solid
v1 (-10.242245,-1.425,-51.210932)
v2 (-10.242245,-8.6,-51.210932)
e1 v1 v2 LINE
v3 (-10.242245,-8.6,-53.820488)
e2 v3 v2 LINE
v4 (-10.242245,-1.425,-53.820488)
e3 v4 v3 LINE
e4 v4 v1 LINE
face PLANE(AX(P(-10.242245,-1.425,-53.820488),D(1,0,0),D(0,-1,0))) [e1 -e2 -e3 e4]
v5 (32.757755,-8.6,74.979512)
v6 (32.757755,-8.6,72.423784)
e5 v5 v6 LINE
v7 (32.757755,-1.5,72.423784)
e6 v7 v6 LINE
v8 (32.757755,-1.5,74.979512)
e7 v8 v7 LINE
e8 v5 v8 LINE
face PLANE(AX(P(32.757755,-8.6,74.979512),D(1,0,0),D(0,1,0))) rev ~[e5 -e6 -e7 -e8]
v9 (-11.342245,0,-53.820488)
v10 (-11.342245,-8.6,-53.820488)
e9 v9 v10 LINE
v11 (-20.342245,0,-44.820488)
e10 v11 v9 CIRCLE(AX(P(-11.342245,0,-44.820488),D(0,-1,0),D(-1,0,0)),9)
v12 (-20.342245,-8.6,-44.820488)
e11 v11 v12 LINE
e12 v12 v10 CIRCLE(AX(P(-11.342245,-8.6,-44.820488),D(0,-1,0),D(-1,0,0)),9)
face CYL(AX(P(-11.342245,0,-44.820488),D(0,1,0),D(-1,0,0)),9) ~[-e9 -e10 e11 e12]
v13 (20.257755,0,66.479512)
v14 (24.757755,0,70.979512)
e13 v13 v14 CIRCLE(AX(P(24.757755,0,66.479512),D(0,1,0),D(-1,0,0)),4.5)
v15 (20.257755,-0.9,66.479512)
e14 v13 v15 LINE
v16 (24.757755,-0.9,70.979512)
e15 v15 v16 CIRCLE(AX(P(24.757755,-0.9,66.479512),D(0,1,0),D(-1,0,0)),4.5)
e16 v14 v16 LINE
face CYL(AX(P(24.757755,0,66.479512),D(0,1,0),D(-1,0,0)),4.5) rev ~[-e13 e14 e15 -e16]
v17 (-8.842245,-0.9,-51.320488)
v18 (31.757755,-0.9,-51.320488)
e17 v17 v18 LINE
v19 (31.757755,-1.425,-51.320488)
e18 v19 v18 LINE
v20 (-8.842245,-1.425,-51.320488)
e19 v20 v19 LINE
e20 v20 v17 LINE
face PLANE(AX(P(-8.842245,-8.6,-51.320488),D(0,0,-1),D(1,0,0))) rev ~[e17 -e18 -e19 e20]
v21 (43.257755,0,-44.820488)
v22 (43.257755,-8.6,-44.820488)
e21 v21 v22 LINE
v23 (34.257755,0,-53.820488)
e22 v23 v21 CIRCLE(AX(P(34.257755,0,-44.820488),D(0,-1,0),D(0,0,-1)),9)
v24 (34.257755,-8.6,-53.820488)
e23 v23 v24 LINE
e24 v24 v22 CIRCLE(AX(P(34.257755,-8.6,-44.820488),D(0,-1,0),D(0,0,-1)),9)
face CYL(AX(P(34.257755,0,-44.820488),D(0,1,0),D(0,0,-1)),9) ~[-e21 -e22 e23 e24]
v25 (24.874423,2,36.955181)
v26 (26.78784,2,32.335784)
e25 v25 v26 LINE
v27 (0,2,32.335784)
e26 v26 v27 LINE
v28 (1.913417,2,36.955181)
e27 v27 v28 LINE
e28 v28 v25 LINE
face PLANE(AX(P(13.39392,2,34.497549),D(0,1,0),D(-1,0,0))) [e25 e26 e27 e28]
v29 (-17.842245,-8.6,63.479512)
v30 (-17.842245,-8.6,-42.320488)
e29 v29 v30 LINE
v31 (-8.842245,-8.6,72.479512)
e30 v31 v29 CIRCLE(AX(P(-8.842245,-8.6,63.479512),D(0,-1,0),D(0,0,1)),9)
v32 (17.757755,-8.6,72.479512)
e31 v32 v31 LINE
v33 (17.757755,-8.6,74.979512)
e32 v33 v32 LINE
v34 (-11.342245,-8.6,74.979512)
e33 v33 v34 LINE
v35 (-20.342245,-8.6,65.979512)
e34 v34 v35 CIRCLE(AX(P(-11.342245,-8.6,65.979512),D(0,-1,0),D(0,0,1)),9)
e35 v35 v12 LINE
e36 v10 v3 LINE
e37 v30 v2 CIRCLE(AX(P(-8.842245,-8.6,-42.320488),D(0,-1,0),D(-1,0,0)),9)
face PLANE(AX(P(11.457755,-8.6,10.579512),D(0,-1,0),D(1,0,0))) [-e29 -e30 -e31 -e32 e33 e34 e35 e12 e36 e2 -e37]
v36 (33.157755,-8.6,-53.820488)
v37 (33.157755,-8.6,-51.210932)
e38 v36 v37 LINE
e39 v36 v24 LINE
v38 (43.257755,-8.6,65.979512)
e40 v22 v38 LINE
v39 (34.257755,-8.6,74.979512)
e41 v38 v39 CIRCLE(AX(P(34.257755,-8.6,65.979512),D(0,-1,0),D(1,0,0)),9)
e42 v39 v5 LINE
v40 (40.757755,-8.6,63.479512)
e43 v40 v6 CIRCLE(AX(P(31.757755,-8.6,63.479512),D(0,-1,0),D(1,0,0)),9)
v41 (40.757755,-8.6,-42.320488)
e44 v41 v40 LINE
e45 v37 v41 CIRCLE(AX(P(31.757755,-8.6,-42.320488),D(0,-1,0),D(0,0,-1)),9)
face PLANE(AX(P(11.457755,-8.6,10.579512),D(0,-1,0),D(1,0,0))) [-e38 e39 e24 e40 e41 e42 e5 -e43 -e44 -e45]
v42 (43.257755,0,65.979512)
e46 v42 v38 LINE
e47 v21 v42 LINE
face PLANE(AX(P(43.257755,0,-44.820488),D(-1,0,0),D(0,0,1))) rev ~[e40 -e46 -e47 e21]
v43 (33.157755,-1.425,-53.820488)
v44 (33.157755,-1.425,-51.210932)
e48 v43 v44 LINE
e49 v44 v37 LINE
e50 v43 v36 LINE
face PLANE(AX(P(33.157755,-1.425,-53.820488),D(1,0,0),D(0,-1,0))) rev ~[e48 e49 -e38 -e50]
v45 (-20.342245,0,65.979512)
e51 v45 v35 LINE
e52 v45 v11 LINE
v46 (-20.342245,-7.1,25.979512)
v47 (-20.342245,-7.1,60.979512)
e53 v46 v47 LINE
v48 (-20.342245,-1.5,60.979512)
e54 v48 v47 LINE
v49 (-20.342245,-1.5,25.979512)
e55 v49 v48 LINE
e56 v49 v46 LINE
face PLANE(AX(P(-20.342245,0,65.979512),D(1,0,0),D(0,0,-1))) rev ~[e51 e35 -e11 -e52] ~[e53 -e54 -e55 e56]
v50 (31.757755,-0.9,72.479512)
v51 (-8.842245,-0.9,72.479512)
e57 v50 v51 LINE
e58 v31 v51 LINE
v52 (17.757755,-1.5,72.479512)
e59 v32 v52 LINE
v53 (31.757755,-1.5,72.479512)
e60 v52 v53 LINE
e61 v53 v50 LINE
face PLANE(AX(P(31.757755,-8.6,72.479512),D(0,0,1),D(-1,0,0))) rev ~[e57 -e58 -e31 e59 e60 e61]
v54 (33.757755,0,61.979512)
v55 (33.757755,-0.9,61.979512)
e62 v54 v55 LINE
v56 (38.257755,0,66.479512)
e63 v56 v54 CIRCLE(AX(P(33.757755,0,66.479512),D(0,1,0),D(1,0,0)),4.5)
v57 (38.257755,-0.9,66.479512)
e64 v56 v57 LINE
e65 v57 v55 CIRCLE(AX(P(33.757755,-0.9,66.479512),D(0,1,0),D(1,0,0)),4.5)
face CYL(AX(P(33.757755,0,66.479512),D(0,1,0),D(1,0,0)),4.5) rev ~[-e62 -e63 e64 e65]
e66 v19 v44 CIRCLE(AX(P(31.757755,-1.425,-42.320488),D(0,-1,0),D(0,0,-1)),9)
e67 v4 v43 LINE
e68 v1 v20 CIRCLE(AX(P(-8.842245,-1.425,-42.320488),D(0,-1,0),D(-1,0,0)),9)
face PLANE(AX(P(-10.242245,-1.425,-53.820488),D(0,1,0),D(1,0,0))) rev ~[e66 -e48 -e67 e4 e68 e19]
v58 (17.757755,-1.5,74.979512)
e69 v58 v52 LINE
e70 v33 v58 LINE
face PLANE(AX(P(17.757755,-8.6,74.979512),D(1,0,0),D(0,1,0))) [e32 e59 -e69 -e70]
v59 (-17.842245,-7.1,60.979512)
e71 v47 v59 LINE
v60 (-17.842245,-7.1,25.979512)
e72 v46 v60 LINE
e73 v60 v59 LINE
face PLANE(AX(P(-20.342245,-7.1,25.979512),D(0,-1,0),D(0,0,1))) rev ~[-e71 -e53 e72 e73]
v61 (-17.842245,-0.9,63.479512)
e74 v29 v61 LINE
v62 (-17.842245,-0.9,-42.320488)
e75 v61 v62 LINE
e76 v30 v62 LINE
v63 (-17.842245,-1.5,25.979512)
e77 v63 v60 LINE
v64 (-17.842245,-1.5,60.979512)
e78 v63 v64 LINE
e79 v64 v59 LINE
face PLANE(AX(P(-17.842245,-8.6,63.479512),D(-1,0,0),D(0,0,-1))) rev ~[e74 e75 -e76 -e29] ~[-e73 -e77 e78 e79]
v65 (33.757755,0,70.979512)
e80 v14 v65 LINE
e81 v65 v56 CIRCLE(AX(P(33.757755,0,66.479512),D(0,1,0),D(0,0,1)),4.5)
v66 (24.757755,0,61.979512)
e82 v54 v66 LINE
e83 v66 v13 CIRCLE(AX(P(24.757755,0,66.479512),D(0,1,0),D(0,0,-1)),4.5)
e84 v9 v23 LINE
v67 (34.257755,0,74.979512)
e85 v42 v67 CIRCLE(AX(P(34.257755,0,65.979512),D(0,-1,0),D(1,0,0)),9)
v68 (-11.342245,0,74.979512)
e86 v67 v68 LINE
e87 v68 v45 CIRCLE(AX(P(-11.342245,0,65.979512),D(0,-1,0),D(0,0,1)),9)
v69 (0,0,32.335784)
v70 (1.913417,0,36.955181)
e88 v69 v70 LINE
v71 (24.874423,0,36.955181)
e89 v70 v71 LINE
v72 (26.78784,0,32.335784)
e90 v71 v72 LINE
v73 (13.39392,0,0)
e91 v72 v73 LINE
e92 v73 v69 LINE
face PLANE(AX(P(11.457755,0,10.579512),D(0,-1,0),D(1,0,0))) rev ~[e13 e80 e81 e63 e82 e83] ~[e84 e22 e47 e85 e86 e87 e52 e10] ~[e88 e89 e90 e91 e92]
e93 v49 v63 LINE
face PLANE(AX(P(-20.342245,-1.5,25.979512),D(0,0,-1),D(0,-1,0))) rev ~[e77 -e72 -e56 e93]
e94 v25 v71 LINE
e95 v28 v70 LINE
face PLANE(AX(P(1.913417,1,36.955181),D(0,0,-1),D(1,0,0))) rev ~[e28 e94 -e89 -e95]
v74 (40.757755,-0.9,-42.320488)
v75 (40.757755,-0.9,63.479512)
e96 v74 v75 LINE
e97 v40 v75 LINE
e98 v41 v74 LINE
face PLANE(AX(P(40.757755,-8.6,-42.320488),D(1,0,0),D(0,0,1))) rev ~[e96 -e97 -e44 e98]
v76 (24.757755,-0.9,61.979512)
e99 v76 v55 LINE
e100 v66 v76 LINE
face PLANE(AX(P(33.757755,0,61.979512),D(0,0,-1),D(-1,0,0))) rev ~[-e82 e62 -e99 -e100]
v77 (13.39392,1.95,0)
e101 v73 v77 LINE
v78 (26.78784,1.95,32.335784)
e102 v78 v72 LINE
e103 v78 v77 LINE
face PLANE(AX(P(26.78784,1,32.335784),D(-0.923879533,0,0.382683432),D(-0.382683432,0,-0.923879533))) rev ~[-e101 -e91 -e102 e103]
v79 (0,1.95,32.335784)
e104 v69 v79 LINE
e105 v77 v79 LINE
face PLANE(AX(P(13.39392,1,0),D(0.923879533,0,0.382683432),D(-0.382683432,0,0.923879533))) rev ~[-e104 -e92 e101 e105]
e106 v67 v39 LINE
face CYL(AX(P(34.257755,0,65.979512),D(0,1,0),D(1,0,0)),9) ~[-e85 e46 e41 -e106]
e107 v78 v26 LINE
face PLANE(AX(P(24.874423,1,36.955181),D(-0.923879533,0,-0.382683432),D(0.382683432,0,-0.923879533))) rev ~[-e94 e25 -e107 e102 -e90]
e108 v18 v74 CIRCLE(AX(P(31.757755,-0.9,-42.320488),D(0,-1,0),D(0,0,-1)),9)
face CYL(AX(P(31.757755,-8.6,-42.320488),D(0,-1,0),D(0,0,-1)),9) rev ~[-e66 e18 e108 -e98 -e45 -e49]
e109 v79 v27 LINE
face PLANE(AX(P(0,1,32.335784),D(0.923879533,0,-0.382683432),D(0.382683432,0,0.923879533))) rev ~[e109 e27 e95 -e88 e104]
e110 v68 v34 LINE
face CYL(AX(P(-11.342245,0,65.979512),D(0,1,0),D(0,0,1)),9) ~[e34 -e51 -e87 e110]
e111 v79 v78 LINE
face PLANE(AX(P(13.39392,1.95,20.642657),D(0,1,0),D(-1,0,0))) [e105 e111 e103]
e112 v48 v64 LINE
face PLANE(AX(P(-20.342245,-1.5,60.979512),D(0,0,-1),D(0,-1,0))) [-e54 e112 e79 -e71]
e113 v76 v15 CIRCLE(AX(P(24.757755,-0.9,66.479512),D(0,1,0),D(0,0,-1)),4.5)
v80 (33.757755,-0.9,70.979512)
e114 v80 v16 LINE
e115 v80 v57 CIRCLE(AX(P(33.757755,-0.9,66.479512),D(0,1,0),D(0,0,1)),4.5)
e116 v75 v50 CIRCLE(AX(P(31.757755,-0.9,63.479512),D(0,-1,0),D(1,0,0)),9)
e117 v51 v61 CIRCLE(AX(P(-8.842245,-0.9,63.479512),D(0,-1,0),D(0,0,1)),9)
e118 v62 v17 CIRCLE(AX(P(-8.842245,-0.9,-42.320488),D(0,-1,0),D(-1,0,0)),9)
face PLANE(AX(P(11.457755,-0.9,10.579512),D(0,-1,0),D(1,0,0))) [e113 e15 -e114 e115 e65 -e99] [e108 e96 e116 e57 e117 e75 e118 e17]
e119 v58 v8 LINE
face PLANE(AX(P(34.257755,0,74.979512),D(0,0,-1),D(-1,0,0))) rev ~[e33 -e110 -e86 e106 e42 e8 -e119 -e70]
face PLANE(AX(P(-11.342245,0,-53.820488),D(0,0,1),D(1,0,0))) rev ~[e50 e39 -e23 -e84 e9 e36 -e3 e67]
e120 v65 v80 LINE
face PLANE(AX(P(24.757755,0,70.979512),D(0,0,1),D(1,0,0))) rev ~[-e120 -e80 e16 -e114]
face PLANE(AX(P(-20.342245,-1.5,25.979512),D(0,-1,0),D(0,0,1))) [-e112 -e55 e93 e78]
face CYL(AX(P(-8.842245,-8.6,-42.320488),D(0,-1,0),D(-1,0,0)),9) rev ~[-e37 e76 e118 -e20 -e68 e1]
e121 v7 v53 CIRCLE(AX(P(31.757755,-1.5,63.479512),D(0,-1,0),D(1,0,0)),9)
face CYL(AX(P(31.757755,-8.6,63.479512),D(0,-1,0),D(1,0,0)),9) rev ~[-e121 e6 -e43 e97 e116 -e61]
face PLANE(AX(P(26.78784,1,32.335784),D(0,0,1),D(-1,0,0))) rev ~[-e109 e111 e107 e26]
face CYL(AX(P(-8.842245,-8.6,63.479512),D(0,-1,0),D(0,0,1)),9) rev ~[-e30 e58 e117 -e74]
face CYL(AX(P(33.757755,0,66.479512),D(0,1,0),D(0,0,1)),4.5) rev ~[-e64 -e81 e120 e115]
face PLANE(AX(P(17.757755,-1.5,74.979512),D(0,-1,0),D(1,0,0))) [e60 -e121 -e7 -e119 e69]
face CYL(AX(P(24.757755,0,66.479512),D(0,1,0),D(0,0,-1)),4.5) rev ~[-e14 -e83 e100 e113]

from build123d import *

# Parameters (mm, degrees)
F1_DEPTH  = 8.6
F3_DEPTH  = 7.7
F5_DEPTH  = 5
F7_DEPTH  = 1
F8_W      = 43.4
F8_H      = 7.1749998596
F9_DEPTH  = 25
F10_W     = 15
F10_H     = 7.1
F11_DEPTH = 25
F12_W     = 5.6
F12_H     = 35
F13_DEPTH = 25
F15_DEPTH = 1
F17_DEPTH = 0.95


# Not quite as in the source:
# - a feature names something its author has since deleted; it is built from what else it names


with BuildPart() as f1:
    # F0 (on Front) → F1 (new body)
    with BuildSketch(Plane.XZ):
        with BuildLine():
            Line((34.2577553943, 74.9795119995), (-11.3422446057, 74.9795119995))
            ThreePointArc((-11.3422446057, 74.9795119995), (-17.7062056364, 72.3434730302), (-20.3422446057, 65.9795119995))
            Line((-20.3422446057, 65.9795119995), (-20.3422446057, -44.8204880005))
            ThreePointArc((-20.3422446057, -44.8204880005), (-17.7062056364, -51.1844490312), (-11.3422446057, -53.8204880005))
            Line((-11.3422446057, -53.8204880005), (34.2577553943, -53.8204880005))
            ThreePointArc((34.2577553943, -53.8204880005), (40.621716425, -51.1844490312), (43.2577553943, -44.8204880005))
            Line((43.2577553943, -44.8204880005), (43.2577553943, 65.9795119995))
            ThreePointArc((43.2577553943, 65.9795119995), (40.621716425, 72.3434730302), (34.2577553943, 74.9795119995))
        make_face()
    extrude(amount=F1_DEPTH)

    # F2 (on face) → F3 (cut)
    with BuildSketch(Plane.XZ.offset(8.6)):
        with BuildLine():
            Line((31.7577553943, 72.4795119995), (-8.8422446057, 72.4795119995))
            ThreePointArc((-8.8422446057, 72.4795119995), (-15.2062056364, 69.8434730302), (-17.8422446057, 63.4795119995))
            Line((-17.8422446057, 63.4795119995), (-17.8422446057, -42.3204880005))
            ThreePointArc((-17.8422446057, -42.3204880005), (-15.2062056364, -48.6844490312), (-8.8422446057, -51.3204880005))
            Line((-8.8422446057, -51.3204880005), (31.7577553943, -51.3204880005))
            ThreePointArc((31.7577553943, -51.3204880005), (38.121716425, -48.6844490312), (40.7577553943, -42.3204880005))
            Line((40.7577553943, -42.3204880005), (40.7577553943, 63.4795119995))
            ThreePointArc((40.7577553943, 63.4795119995), (38.121716425, 69.8434730302), (31.7577553943, 72.4795119995))
        make_face()
    extrude(amount=-F3_DEPTH, mode=Mode.SUBTRACT)

    # F4 (on face) → F5 (cut)
    with BuildSketch(Plane(origin=(0, 0, 0), x_dir=(-1, 0, 0), z_dir=(0, 1, 0))):
        with BuildLine():
            Line((-24.7577553943, 70.9795119995), (-33.7577553943, 70.9795119995))
            ThreePointArc((-33.7577553943, 70.9795119995), (-36.9397359096, 69.6614925148), (-38.2577553943, 66.4795119995))
            ThreePointArc((-38.2577553943, 66.4795119995), (-36.9397359096, 63.2975314842), (-33.7577553943, 61.9795119995))
            Line((-33.7577553943, 61.9795119995), (-24.7577553943, 61.9795119995))
            ThreePointArc((-24.7577553943, 61.9795119995), (-21.5757748789, 63.2975314842), (-20.2577553943, 66.4795119995))
            ThreePointArc((-20.2577553943, 66.4795119995), (-21.5757748789, 69.6614925148), (-24.7577553943, 70.9795119995))
        make_face()
    extrude(amount=-F5_DEPTH, mode=Mode.SUBTRACT)

    # F6 (on face) → F7 (join)
    with BuildSketch(Plane(origin=(0, 0, 0), x_dir=(-1, 0, 0), z_dir=(0, 1, 0))):
        Polygon((-24.8744231037, 36.9551813005), (-26.7878402656, 32.3357836379), (-13.3939201328, 0), (0, 32.3357836379), (-1.9134171618, 36.9551813005), align=None)
    extrude(amount=F7_DEPTH)

    # F8 (on face) → F9 (cut)
    with BuildSketch(Plane(origin=(0, 0, -53.8204880005), x_dir=(1, 0, 0), z_dir=(0, 0, -1))):
        with Locations((11.4577553943, 5.0125000702)):
            Rectangle(F8_W, F8_H)
    extrude(amount=-F9_DEPTH, mode=Mode.SUBTRACT)

    # F10 (on face) → F11 (cut)
    with BuildSketch(Plane.XY.offset(74.9795119995)):
        with Locations((25.2577553943, -5.05)):
            Rectangle(F10_W, F10_H)
    extrude(amount=-F11_DEPTH, mode=Mode.SUBTRACT)

    # F12 (on face) → F13 (cut)
    with BuildSketch(Plane(origin=(-20.3422446057, 0, 0), x_dir=(0, -1, 0), z_dir=(-1, 0, 0))):
        with Locations((4.3, 43.4795119995)):
            Rectangle(F12_W, F12_H)
    extrude(amount=-F13_DEPTH, mode=Mode.SUBTRACT)

    # F14 (on face) → F15 (join)
    with BuildSketch(Plane(origin=(0, 1, 0), x_dir=(-1, 0, 0), z_dir=(0, 1, 0))):
        Polygon((-24.8744231037, 36.9551813005), (-26.7878402656, 32.3357836379), (0, 32.3357836379), (-1.9134171618, 36.9551813005), align=None)
    extrude(amount=F15_DEPTH)

    # F16 (on face) → F17 (join)
    with BuildSketch(Plane(origin=(0, 1, 0), x_dir=(-1, 0, 0), z_dir=(0, 1, 0))):
        Polygon((0, 32.3357836379), (-26.7878402656, 32.3357836379), (-13.3939201328, 0), align=None)
    extrude(amount=F17_DEPTH)


solid = f1.part
